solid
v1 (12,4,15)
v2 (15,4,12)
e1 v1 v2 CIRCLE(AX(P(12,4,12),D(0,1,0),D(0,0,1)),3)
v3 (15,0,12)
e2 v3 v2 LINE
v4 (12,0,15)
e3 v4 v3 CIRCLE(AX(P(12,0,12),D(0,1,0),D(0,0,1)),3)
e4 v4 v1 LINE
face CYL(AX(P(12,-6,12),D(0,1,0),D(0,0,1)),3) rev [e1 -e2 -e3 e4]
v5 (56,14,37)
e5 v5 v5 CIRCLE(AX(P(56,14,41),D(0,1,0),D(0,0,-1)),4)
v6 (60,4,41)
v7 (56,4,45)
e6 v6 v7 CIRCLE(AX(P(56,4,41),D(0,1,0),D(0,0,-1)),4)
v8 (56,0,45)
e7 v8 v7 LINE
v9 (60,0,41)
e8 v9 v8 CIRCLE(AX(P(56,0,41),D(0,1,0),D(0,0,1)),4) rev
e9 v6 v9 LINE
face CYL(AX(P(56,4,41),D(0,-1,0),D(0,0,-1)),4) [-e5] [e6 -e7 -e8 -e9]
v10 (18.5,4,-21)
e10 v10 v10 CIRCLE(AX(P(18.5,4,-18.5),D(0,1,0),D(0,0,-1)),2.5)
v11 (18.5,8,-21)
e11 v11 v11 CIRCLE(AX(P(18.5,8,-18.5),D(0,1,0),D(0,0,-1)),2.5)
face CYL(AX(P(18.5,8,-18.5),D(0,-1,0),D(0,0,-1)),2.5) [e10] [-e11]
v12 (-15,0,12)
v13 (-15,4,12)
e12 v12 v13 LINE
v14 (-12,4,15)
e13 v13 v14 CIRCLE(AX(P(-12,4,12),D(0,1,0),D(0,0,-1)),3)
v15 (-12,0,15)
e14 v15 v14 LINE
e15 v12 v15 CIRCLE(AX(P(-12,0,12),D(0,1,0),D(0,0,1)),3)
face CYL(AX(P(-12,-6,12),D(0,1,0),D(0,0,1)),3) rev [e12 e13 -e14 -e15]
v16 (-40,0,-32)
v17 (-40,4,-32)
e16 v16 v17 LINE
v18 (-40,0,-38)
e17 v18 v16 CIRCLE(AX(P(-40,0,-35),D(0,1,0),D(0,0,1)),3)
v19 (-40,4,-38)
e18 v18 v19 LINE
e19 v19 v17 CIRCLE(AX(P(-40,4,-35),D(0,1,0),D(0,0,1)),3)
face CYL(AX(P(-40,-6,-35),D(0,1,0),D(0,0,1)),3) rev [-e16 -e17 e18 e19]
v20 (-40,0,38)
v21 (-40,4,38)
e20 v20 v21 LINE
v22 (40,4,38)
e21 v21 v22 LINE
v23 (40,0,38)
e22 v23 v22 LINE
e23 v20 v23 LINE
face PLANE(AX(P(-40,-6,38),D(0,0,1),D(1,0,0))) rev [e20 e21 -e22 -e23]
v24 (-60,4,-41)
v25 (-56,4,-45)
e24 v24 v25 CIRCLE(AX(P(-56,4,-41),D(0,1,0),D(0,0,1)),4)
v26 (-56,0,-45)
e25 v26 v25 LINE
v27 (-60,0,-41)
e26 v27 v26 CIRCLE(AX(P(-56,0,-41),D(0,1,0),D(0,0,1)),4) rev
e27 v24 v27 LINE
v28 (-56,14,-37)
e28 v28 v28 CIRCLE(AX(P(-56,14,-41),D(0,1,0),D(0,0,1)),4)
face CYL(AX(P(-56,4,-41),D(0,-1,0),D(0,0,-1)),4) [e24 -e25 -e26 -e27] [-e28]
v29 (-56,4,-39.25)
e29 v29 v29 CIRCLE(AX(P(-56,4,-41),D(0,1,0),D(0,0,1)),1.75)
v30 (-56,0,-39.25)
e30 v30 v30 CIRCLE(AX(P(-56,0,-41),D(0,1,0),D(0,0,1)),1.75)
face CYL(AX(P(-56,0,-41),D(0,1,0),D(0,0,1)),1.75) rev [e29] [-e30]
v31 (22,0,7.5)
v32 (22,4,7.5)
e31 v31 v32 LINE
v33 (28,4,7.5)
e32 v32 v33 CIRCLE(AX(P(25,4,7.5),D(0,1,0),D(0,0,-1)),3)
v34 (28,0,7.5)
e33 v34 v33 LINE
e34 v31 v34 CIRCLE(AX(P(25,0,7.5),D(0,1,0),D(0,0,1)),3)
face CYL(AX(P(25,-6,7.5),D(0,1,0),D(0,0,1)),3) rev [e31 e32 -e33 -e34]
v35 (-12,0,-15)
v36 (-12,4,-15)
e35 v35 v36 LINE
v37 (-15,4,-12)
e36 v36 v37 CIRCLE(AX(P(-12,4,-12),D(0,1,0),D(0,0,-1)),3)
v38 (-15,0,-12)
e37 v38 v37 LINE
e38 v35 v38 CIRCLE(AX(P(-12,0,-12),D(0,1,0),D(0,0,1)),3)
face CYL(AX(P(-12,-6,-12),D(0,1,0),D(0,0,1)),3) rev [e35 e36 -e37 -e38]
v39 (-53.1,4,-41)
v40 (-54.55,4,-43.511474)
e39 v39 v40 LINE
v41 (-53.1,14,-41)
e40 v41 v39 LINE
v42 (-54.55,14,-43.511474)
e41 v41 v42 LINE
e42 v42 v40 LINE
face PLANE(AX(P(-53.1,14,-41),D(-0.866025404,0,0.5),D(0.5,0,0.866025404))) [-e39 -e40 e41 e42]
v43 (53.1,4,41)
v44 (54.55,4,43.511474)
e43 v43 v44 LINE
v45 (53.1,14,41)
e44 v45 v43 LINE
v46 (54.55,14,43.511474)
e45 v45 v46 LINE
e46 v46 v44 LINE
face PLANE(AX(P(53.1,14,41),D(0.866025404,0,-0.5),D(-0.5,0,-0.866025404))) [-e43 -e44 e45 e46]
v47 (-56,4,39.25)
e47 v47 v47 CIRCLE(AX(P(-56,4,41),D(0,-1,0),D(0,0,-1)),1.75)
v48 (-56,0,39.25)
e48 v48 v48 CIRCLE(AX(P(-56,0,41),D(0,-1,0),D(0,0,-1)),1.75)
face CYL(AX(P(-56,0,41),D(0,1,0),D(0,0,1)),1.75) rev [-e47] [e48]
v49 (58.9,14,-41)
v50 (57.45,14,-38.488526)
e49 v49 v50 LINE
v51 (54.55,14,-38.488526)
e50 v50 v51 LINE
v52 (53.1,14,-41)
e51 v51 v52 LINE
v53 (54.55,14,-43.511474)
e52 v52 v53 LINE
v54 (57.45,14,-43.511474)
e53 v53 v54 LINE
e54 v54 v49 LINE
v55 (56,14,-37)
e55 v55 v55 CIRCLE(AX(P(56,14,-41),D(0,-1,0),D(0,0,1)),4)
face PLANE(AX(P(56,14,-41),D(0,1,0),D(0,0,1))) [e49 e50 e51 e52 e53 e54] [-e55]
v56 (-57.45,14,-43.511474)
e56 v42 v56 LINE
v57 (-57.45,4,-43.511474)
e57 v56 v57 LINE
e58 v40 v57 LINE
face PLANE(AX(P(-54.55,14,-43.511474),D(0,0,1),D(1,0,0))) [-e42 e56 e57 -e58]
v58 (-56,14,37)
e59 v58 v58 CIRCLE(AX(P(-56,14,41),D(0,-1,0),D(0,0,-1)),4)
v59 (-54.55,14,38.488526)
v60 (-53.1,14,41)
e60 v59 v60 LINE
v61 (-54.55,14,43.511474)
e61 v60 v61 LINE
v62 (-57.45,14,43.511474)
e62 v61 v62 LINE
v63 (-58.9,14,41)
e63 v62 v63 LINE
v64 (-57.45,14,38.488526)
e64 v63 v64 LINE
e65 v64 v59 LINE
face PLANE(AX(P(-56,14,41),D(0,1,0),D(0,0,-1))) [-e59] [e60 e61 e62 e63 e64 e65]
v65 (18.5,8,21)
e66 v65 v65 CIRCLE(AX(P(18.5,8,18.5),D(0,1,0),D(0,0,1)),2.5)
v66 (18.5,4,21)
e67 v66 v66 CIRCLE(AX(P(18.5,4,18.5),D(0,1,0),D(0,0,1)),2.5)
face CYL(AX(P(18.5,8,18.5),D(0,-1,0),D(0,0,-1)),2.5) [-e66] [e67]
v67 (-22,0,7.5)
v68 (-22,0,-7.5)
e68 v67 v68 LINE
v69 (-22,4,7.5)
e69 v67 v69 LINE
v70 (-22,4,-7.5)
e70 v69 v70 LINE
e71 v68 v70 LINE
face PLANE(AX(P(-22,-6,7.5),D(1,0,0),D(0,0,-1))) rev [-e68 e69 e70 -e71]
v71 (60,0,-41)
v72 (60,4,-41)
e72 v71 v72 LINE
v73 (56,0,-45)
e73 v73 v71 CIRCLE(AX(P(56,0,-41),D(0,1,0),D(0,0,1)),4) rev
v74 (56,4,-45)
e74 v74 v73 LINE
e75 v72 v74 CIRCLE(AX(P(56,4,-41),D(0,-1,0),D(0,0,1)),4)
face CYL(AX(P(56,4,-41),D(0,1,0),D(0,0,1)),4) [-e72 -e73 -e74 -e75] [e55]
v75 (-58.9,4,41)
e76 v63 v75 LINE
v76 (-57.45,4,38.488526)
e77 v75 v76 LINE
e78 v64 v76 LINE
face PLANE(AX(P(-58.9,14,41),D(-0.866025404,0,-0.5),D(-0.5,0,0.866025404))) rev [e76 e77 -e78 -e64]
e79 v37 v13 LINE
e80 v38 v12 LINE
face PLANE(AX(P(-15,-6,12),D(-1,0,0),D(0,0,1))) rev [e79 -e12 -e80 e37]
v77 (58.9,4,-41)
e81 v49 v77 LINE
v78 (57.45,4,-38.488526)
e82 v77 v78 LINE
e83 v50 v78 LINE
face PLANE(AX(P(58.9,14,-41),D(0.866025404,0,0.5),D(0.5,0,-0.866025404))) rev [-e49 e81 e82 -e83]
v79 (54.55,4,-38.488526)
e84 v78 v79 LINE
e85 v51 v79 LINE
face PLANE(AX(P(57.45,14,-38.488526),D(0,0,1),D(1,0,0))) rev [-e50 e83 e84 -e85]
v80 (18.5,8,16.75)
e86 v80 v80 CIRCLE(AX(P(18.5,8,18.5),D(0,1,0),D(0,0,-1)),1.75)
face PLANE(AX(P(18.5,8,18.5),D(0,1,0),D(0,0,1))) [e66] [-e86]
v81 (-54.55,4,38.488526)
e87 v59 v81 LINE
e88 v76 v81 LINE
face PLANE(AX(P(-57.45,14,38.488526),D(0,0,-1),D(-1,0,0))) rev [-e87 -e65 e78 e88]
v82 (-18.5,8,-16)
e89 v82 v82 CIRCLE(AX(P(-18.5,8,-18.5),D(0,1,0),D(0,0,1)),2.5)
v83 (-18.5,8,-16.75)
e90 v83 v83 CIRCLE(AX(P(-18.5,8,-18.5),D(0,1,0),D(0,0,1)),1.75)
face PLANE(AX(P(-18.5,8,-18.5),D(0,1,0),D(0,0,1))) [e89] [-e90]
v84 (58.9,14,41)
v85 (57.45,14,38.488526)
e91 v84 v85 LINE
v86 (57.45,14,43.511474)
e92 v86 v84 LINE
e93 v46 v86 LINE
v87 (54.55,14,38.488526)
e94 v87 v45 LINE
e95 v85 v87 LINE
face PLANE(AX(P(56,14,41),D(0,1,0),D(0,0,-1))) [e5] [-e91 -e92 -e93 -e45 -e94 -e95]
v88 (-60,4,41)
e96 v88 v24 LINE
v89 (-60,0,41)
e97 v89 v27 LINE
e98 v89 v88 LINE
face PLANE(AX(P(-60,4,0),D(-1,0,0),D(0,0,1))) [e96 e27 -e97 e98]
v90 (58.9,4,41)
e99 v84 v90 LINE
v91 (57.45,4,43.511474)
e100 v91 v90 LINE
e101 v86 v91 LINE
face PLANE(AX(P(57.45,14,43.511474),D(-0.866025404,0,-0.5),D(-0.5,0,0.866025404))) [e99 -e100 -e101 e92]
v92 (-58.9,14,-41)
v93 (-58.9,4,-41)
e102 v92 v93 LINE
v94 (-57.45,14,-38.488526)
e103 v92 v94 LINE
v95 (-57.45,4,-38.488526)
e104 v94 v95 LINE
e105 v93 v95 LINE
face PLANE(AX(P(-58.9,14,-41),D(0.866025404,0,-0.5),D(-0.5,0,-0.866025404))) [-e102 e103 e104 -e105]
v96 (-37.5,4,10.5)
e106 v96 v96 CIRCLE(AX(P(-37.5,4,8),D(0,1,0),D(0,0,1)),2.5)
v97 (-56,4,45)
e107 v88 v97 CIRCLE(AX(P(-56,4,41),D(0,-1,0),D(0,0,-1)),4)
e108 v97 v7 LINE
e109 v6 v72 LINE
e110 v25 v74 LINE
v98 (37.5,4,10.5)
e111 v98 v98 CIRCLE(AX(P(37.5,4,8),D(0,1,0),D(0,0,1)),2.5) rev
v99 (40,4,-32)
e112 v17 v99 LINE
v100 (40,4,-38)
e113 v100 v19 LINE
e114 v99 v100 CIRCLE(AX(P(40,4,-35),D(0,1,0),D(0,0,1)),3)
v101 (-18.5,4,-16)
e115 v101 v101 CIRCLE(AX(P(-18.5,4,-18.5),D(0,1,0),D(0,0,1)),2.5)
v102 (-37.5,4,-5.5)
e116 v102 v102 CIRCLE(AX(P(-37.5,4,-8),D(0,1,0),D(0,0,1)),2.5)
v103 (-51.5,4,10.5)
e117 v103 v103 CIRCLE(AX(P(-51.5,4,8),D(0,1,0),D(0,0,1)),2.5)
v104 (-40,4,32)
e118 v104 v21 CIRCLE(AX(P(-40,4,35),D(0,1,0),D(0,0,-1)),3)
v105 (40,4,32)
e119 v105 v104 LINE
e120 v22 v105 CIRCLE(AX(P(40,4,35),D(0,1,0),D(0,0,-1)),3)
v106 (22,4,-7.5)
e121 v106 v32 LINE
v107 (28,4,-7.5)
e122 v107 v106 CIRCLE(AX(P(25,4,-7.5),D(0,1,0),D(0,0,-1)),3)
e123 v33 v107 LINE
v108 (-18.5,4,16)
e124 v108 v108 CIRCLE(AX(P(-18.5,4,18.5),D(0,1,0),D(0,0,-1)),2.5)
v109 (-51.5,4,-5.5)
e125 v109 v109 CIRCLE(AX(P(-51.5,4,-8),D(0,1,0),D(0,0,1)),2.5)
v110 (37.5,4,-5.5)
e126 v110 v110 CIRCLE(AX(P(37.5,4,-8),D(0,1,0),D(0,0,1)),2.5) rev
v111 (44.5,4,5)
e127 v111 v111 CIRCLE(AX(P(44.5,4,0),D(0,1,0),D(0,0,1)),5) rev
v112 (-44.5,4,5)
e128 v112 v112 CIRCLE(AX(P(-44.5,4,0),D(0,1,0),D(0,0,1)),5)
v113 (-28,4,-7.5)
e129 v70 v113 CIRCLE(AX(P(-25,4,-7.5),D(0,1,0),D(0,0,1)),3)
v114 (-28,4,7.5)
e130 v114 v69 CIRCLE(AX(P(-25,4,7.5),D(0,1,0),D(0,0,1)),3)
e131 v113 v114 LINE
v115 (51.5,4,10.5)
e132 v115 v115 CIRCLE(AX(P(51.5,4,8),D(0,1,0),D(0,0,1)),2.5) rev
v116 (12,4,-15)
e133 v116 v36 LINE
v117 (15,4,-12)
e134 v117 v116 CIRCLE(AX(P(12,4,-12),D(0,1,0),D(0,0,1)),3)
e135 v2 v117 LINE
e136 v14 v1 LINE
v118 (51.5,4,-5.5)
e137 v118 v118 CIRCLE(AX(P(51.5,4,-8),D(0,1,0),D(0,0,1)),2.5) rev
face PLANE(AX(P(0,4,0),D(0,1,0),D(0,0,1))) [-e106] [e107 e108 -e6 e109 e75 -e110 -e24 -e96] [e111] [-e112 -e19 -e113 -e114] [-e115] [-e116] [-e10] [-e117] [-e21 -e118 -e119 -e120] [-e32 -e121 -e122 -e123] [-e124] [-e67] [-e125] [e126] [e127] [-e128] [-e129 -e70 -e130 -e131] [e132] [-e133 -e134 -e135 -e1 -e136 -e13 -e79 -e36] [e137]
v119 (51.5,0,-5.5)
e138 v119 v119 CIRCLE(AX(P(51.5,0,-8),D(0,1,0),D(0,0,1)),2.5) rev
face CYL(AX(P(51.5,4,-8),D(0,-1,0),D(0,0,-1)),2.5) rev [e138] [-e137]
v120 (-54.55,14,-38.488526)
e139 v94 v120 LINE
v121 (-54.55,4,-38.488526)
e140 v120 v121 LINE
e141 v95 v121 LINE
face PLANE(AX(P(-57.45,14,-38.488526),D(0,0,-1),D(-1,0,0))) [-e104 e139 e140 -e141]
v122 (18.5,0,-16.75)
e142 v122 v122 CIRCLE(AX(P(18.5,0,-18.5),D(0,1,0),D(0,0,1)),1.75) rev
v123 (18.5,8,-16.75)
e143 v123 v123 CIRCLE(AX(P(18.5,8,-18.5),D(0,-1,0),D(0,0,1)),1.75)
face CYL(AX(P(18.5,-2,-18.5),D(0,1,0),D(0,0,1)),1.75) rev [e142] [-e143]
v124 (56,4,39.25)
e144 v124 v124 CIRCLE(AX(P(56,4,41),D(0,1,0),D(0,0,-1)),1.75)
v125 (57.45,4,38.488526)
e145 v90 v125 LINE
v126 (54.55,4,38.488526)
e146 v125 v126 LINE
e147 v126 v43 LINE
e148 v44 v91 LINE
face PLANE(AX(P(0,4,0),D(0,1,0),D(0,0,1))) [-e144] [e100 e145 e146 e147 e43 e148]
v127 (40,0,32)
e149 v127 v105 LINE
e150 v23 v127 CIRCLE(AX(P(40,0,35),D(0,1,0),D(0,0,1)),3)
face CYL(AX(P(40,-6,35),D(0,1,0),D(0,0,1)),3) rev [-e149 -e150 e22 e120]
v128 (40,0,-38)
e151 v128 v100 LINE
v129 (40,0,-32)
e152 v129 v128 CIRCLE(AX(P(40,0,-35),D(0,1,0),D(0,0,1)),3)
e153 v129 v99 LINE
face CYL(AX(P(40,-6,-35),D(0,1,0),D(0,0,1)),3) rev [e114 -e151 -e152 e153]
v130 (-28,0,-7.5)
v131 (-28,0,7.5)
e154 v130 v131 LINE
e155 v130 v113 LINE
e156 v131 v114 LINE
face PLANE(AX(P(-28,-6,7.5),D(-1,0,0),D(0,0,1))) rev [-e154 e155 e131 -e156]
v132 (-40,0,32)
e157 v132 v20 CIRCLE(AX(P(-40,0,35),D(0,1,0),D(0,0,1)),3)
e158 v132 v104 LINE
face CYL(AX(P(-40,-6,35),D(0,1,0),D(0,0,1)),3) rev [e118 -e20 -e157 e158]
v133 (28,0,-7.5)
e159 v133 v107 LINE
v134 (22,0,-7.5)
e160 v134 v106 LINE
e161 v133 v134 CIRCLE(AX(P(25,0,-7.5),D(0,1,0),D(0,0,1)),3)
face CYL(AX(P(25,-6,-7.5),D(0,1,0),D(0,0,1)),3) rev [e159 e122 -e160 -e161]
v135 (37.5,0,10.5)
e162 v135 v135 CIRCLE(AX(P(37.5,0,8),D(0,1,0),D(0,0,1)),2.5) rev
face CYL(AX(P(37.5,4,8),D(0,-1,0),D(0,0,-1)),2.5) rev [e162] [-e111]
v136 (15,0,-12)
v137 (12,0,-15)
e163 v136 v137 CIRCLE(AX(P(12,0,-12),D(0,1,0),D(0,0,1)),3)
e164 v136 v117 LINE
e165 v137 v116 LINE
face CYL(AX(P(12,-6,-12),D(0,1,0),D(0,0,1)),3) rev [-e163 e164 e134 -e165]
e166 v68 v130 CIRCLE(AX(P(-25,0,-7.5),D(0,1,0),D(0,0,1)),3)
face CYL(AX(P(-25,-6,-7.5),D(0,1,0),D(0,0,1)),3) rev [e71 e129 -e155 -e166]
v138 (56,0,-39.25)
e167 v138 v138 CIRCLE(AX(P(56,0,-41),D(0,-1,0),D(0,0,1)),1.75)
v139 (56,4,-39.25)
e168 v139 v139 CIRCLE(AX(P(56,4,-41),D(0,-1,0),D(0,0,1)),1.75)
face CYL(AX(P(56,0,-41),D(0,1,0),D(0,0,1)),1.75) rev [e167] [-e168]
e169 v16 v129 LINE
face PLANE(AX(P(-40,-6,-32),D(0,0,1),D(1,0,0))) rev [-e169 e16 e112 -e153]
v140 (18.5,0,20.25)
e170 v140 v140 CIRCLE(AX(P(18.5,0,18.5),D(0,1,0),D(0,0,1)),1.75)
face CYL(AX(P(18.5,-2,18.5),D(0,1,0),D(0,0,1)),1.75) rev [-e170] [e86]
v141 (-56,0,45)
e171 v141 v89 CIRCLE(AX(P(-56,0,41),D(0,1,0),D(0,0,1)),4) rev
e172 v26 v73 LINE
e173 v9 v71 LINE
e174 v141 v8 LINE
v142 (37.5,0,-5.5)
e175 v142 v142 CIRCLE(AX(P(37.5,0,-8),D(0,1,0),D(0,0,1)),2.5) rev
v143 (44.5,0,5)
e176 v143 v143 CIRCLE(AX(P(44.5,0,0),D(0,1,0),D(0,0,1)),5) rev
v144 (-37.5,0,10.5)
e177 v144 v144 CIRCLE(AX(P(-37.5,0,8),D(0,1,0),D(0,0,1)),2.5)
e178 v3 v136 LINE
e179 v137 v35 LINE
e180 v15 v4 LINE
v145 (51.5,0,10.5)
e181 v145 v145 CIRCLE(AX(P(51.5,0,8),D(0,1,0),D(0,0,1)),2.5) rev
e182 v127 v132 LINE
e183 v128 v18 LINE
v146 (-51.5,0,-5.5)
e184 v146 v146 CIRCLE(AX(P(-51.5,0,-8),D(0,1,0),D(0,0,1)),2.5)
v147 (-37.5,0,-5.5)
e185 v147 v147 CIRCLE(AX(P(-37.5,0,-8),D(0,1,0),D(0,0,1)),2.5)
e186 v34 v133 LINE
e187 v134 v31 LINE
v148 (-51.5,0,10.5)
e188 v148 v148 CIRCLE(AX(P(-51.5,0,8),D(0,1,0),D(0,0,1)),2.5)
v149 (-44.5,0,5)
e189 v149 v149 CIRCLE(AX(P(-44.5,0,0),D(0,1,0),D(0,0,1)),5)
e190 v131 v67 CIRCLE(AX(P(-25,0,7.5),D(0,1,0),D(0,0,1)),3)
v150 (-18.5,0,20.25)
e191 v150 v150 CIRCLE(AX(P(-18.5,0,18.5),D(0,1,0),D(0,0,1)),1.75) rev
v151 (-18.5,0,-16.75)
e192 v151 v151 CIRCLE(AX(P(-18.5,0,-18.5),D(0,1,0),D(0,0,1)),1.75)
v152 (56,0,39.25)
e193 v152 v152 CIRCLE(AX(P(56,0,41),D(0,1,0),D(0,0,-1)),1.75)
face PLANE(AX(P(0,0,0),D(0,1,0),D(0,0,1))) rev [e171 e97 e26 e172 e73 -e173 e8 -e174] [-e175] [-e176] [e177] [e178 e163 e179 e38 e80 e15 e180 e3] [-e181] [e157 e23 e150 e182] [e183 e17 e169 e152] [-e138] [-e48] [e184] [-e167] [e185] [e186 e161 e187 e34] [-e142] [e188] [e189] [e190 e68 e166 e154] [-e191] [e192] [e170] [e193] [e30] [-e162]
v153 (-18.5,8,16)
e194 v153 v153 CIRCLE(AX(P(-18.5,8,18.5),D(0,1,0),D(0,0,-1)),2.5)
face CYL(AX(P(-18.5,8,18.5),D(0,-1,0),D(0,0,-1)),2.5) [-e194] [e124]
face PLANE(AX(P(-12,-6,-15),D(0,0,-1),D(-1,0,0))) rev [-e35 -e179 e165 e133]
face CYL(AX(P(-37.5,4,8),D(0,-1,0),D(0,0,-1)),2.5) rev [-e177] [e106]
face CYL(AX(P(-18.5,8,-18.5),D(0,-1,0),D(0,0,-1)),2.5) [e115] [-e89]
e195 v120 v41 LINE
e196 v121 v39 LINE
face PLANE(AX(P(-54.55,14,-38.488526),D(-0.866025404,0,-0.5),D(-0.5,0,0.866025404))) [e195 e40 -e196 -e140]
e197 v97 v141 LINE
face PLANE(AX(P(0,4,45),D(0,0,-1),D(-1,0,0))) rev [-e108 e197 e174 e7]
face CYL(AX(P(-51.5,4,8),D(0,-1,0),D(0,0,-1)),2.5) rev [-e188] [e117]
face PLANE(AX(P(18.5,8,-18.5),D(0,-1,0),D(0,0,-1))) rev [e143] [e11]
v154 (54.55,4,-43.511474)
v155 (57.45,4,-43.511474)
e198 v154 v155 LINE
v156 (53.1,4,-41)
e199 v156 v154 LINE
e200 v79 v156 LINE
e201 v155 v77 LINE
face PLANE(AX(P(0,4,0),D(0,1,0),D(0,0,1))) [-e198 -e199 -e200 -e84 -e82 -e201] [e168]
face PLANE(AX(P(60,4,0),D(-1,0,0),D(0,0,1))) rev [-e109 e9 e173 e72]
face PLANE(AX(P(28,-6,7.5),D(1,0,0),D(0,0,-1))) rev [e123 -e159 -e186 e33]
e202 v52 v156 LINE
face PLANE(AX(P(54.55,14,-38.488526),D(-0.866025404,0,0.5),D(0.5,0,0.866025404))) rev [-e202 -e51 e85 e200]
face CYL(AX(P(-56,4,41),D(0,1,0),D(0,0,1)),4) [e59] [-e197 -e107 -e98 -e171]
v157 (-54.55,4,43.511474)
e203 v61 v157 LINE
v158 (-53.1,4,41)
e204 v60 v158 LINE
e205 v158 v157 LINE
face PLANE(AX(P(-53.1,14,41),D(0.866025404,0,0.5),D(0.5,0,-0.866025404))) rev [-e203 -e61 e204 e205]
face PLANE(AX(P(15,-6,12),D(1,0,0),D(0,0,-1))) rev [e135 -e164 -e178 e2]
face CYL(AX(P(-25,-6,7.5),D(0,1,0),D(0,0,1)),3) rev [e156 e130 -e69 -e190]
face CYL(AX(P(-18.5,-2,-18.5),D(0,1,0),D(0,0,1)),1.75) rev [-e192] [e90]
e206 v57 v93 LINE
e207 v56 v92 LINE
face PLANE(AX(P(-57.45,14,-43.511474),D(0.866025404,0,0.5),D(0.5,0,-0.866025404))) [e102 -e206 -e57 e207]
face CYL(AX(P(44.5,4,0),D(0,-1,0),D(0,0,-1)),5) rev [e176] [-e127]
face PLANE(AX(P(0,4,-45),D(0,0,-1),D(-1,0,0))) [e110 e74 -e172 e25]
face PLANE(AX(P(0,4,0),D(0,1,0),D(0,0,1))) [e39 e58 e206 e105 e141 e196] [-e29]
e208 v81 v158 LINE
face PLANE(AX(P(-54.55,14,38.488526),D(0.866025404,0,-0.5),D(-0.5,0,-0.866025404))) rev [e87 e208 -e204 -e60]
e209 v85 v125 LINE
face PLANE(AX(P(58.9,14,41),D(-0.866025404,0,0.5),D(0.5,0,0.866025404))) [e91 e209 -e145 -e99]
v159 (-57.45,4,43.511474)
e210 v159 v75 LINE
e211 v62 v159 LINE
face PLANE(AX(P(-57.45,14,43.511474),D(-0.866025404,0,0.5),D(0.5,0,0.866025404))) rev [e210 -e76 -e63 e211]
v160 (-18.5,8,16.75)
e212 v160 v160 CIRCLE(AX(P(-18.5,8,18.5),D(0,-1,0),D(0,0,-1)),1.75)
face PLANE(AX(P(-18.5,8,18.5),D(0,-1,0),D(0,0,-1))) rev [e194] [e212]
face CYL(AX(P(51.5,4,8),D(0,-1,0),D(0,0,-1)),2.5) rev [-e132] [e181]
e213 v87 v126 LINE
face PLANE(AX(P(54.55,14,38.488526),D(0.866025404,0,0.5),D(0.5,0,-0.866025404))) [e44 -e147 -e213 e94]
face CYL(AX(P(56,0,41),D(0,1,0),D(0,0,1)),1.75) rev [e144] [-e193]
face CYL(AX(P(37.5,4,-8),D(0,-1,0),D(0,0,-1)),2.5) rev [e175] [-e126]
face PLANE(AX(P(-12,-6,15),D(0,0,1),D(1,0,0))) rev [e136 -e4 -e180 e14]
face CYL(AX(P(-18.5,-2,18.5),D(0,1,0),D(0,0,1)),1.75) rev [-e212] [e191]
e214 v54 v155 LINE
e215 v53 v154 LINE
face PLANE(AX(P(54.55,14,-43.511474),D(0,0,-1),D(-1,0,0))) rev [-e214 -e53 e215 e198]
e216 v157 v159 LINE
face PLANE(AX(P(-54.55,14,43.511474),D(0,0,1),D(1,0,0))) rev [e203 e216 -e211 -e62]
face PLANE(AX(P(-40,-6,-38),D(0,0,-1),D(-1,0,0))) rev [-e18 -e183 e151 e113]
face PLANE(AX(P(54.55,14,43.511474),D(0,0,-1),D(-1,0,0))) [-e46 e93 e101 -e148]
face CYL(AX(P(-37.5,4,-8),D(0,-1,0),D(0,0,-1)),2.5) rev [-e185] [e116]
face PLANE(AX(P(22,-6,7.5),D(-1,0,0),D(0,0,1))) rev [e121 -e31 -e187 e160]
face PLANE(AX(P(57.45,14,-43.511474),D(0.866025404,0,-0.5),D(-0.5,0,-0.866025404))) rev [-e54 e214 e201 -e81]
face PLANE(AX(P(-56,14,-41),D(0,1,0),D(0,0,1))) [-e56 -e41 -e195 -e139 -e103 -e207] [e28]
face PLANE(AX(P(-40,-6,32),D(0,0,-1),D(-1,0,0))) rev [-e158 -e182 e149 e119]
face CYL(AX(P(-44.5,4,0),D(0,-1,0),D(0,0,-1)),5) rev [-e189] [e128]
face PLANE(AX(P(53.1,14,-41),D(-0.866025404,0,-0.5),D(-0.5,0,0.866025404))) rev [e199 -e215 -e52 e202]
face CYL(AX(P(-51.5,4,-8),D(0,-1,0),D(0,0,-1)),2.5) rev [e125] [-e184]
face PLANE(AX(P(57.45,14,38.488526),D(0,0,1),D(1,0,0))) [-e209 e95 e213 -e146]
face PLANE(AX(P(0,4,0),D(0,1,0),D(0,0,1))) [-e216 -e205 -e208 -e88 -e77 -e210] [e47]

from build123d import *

# Parameters (mm, degrees)
SKETCH1_W               = 120
SKETCH1_H               = 90
SKETCH1_R               = 2.5
SKETCH1_R_2             = 5
BOSS_EXTRUDE1_DEPTH     = 4
FILLET1_R               = 4
BOSS_EXTRUDE2_START     = 10
SKETCH2_R               = 4
BOSS_EXTRUDE2_DEPTH     = 10
MIRROR2_START           = 10
MIRROR2_COPY_1_SKETCH_R = 4
MIRROR2_COPY_1_DEPTH    = 10
MIRROR2_COPY_2_SKETCH_R = 4
MIRROR2_COPY_2_DEPTH    = 10
SKETCH3_R               = 1.75
CUT_EXTRUDE1_DEPTH      = 4
MIRROR4_COPY_1_SKETCH_R = 1.75
MIRROR4_COPY_1_DEPTH    = 4
MIRROR4_COPY_2_SKETCH_R = 1.75
MIRROR4_COPY_2_DEPTH    = 4
SKETCH4_R               = 2.5
BOSS_EXTRUDE3_DEPTH     = 4
SKETCH5_R               = 1.75
CUT_EXTRUDE2_DEPTH      = 10
MIRROR6_COPY_1_SKETCH_R = 1.75
MIRROR6_COPY_1_DEPTH    = 10
MIRROR6_COPY_2_SKETCH_R = 1.75
MIRROR6_COPY_2_DEPTH    = 10
CUT_EXTRUDE3_DEPTH      = 10


with BuildPart() as part:
    # Sketch1 → Boss-Extrude1 (new body)
    with BuildSketch(Plane(origin=(0, 0, 0), x_dir=(1, 0, 0), z_dir=(0, 1, 0))):
        Rectangle(SKETCH1_W, SKETCH1_H)
        with Locations((-51.5, 8)):
            Circle(SKETCH1_R, mode=Mode.SUBTRACT)
        with Locations((-44.5, 0)):
            Circle(SKETCH1_R_2, mode=Mode.SUBTRACT)
        with Locations((-37.5, 8)):
            Circle(SKETCH1_R, mode=Mode.SUBTRACT)
        with Locations((-51.5, -8)):
            Circle(SKETCH1_R, mode=Mode.SUBTRACT)
        with Locations((-37.5, -8)):
            Circle(SKETCH1_R, mode=Mode.SUBTRACT)
        with Locations((44.5, 0)):
            Circle(SKETCH1_R_2, mode=Mode.SUBTRACT)
        with Locations((37.5, 8)):
            Circle(SKETCH1_R, mode=Mode.SUBTRACT)
        with Locations((51.5, 8)):
            Circle(SKETCH1_R, mode=Mode.SUBTRACT)
        with Locations((37.5, -8)):
            Circle(SKETCH1_R, mode=Mode.SUBTRACT)
        with Locations((51.5, -8)):
            Circle(SKETCH1_R, mode=Mode.SUBTRACT)
    extrude(amount=BOSS_EXTRUDE1_DEPTH)

    # Fillet1
    fillet1_edges = [part.edges().sort_by_distance(p)[0] for p in [
        (-60, 2, 45),
        (-60, 2, -45),
        (60, 2, -45),
        (60, 2, 45),
    ]]
    fillet(fillet1_edges, radius=FILLET1_R)

    # Sketch2 → Boss-Extrude2 (add)
    with BuildSketch(Plane(origin=(0, 4, 0), x_dir=(1, 0, 0), z_dir=(0, 1, 0)).offset(BOSS_EXTRUDE2_START)):
        with Locations((-56, 41)):
            Circle(SKETCH2_R)
        Polygon((-53.1, 41), (-54.55, 43.511473671), (-57.45, 43.511473671), (-58.9, 41), (-57.45, 38.488526329), (-54.55, 38.488526329), align=None, mode=Mode.SUBTRACT)
    boss_extrude2 = extrude(amount=-BOSS_EXTRUDE2_DEPTH)

    # Mirror1: Boss-Extrude2 across plane
    add(boss_extrude2.mirror(Plane.XY))

    # Mirror2 copy 1 sketch → Mirror2 copy 1 (add)
    with BuildSketch(Plane(origin=(0, 4, 0), x_dir=(-1, 0, 0), z_dir=(0, 1, 0)).offset(MIRROR2_START)):
        with Locations((-56, 41)):
            Circle(MIRROR2_COPY_1_SKETCH_R)
        Polygon((-53.1, 41), (-54.55, 43.511473671), (-57.45, 43.511473671), (-58.9, 41), (-57.45, 38.488526329), (-54.55, 38.488526329), align=None, mode=Mode.SUBTRACT)
    extrude(amount=-MIRROR2_COPY_1_DEPTH)

    # Mirror2 copy 2 sketch → Mirror2 copy 2 (add)
    with BuildSketch(Plane(origin=(0, 4, 0), x_dir=(-1, 0, 0), z_dir=(0, 1, 0)).offset(MIRROR2_START)):
        with Locations((-56, -41)):
            Circle(MIRROR2_COPY_2_SKETCH_R)
        Polygon((-53.1, -41), (-54.55, -43.511473671), (-57.45, -43.511473671), (-58.9, -41), (-57.45, -38.488526329), (-54.55, -38.488526329), align=None, mode=Mode.SUBTRACT)
    extrude(amount=-MIRROR2_COPY_2_DEPTH)

    # Sketch3 → Cut-Extrude1 (cut)
    with BuildSketch(Plane(origin=(0, 4, 0), x_dir=(1, 0, 0), z_dir=(0, 1, 0))):
        with Locations((-56, 41)):
            Circle(SKETCH3_R)
    cut_extrude1 = extrude(amount=-CUT_EXTRUDE1_DEPTH, mode=Mode.SUBTRACT)

    # Mirror3: Cut-Extrude1 across plane
    add(cut_extrude1.mirror(Plane(origin=(0, 0, 0), x_dir=(0, 0, 1), z_dir=(1, 0, 0))), mode=Mode.SUBTRACT)

    # Mirror4 copy 1 sketch → Mirror4 copy 1 (cut)
    with BuildSketch(Plane(origin=(0, 4, 0), x_dir=(-1, 0, 0), z_dir=(0, 1, 0))):
        with Locations((-56, 41)):
            Circle(MIRROR4_COPY_1_SKETCH_R)
    extrude(amount=-MIRROR4_COPY_1_DEPTH, mode=Mode.SUBTRACT)

    # Mirror4 copy 2 sketch → Mirror4 copy 2 (cut)
    with BuildSketch(Plane(origin=(0, 4, 0), x_dir=(1, 0, 0), z_dir=(0, 1, 0))):
        with Locations((-56, -41)):
            Circle(MIRROR4_COPY_2_SKETCH_R)
    extrude(amount=-MIRROR4_COPY_2_DEPTH, mode=Mode.SUBTRACT)

    # Sketch4 → Boss-Extrude3 (add)
    with BuildSketch(Plane(origin=(0, 4, 0), x_dir=(1, 0, 0), z_dir=(0, 1, 0))):
        with Locations((-18.5, 18.5)):
            Circle(SKETCH4_R)
        with Locations((18.5, 18.5)):
            Circle(SKETCH4_R)
        with Locations((18.5, -18.5)):
            Circle(SKETCH4_R)
        with Locations((-18.5, -18.5)):
            Circle(SKETCH4_R)
    extrude(amount=BOSS_EXTRUDE3_DEPTH)

    # Sketch5 → Cut-Extrude2 (cut)
    with BuildSketch(Plane(origin=(0, 8, 0), x_dir=(1, 0, 0), z_dir=(0, 1, 0))):
        with Locations((-18.5, 18.5)):
            Circle(SKETCH5_R)
    cut_extrude2 = extrude(amount=-CUT_EXTRUDE2_DEPTH, mode=Mode.SUBTRACT)

    # Mirror5: Cut-Extrude2 across plane
    add(cut_extrude2.mirror(Plane(origin=(0, 0, 0), x_dir=(0, 0, 1), z_dir=(1, 0, 0))), mode=Mode.SUBTRACT)

    # Mirror6 copy 1 sketch → Mirror6 copy 1 (cut)
    with BuildSketch(Plane(origin=(0, 8, 0), x_dir=(-1, 0, 0), z_dir=(0, 1, 0))):
        with Locations((-18.5, 18.5)):
            Circle(MIRROR6_COPY_1_SKETCH_R)
    extrude(amount=-MIRROR6_COPY_1_DEPTH, mode=Mode.SUBTRACT)

    # Mirror6 copy 2 sketch → Mirror6 copy 2 (cut)
    with BuildSketch(Plane(origin=(0, 8, 0), x_dir=(1, 0, 0), z_dir=(0, 1, 0))):
        with Locations((-18.5, -18.5)):
            Circle(MIRROR6_COPY_2_SKETCH_R)
    extrude(amount=-MIRROR6_COPY_2_DEPTH, mode=Mode.SUBTRACT)

    # Sketch6 → Cut-Extrude3 (cut)
    with BuildSketch(Plane(origin=(0, 4, 0), x_dir=(1, 0, 0), z_dir=(0, 1, 0))):
        with BuildLine():
            Line((-12, -15), (12, -15))
            ThreePointArc((12, -15), (14.121320344, -14.121320344), (15, -12))
            Line((15, -12), (15, 12))
            ThreePointArc((15, 12), (14.121320344, 14.121320344), (12, 15))
            Line((12, 15), (-12, 15))
            ThreePointArc((-12, 15), (-14.121320344, 14.121320344), (-15, 12))
            Line((-15, 12), (-15, -12))
            ThreePointArc((-15, -12), (-14.121320344, -14.121320344), (-12, -15))
        make_face()
        with BuildLine():
            Line((-28, -7.5), (-28, 7.5))
            ThreePointArc((-28, 7.5), (-25, 10.5), (-22, 7.5))
            Line((-22, 7.5), (-22, -7.5))
            ThreePointArc((-22, -7.5), (-25, -10.5), (-28, -7.5))
        make_face()
        with BuildLine():
            Line((28, -7.5), (28, 7.5))
            ThreePointArc((28, 7.5), (25, 10.5), (22, 7.5))
            Line((22, 7.5), (22, -7.5))
            ThreePointArc((22, -7.5), (25, -10.5), (28, -7.5))
        make_face()
        with BuildLine():
            Line((-40, 38), (40, 38))
            ThreePointArc((40, 38), (43, 35), (40, 32))
            Line((40, 32), (-40, 32))
            ThreePointArc((-40, 32), (-43, 35), (-40, 38))
        make_face()
        with BuildLine():
            Line((-40, -38), (40, -38))
            ThreePointArc((40, -38), (43, -35), (40, -32))
            Line((40, -32), (-40, -32))
            ThreePointArc((-40, -32), (-43, -35), (-40, -38))
        make_face()
    extrude(amount=-CUT_EXTRUDE3_DEPTH, mode=Mode.SUBTRACT)


solid = part.part
